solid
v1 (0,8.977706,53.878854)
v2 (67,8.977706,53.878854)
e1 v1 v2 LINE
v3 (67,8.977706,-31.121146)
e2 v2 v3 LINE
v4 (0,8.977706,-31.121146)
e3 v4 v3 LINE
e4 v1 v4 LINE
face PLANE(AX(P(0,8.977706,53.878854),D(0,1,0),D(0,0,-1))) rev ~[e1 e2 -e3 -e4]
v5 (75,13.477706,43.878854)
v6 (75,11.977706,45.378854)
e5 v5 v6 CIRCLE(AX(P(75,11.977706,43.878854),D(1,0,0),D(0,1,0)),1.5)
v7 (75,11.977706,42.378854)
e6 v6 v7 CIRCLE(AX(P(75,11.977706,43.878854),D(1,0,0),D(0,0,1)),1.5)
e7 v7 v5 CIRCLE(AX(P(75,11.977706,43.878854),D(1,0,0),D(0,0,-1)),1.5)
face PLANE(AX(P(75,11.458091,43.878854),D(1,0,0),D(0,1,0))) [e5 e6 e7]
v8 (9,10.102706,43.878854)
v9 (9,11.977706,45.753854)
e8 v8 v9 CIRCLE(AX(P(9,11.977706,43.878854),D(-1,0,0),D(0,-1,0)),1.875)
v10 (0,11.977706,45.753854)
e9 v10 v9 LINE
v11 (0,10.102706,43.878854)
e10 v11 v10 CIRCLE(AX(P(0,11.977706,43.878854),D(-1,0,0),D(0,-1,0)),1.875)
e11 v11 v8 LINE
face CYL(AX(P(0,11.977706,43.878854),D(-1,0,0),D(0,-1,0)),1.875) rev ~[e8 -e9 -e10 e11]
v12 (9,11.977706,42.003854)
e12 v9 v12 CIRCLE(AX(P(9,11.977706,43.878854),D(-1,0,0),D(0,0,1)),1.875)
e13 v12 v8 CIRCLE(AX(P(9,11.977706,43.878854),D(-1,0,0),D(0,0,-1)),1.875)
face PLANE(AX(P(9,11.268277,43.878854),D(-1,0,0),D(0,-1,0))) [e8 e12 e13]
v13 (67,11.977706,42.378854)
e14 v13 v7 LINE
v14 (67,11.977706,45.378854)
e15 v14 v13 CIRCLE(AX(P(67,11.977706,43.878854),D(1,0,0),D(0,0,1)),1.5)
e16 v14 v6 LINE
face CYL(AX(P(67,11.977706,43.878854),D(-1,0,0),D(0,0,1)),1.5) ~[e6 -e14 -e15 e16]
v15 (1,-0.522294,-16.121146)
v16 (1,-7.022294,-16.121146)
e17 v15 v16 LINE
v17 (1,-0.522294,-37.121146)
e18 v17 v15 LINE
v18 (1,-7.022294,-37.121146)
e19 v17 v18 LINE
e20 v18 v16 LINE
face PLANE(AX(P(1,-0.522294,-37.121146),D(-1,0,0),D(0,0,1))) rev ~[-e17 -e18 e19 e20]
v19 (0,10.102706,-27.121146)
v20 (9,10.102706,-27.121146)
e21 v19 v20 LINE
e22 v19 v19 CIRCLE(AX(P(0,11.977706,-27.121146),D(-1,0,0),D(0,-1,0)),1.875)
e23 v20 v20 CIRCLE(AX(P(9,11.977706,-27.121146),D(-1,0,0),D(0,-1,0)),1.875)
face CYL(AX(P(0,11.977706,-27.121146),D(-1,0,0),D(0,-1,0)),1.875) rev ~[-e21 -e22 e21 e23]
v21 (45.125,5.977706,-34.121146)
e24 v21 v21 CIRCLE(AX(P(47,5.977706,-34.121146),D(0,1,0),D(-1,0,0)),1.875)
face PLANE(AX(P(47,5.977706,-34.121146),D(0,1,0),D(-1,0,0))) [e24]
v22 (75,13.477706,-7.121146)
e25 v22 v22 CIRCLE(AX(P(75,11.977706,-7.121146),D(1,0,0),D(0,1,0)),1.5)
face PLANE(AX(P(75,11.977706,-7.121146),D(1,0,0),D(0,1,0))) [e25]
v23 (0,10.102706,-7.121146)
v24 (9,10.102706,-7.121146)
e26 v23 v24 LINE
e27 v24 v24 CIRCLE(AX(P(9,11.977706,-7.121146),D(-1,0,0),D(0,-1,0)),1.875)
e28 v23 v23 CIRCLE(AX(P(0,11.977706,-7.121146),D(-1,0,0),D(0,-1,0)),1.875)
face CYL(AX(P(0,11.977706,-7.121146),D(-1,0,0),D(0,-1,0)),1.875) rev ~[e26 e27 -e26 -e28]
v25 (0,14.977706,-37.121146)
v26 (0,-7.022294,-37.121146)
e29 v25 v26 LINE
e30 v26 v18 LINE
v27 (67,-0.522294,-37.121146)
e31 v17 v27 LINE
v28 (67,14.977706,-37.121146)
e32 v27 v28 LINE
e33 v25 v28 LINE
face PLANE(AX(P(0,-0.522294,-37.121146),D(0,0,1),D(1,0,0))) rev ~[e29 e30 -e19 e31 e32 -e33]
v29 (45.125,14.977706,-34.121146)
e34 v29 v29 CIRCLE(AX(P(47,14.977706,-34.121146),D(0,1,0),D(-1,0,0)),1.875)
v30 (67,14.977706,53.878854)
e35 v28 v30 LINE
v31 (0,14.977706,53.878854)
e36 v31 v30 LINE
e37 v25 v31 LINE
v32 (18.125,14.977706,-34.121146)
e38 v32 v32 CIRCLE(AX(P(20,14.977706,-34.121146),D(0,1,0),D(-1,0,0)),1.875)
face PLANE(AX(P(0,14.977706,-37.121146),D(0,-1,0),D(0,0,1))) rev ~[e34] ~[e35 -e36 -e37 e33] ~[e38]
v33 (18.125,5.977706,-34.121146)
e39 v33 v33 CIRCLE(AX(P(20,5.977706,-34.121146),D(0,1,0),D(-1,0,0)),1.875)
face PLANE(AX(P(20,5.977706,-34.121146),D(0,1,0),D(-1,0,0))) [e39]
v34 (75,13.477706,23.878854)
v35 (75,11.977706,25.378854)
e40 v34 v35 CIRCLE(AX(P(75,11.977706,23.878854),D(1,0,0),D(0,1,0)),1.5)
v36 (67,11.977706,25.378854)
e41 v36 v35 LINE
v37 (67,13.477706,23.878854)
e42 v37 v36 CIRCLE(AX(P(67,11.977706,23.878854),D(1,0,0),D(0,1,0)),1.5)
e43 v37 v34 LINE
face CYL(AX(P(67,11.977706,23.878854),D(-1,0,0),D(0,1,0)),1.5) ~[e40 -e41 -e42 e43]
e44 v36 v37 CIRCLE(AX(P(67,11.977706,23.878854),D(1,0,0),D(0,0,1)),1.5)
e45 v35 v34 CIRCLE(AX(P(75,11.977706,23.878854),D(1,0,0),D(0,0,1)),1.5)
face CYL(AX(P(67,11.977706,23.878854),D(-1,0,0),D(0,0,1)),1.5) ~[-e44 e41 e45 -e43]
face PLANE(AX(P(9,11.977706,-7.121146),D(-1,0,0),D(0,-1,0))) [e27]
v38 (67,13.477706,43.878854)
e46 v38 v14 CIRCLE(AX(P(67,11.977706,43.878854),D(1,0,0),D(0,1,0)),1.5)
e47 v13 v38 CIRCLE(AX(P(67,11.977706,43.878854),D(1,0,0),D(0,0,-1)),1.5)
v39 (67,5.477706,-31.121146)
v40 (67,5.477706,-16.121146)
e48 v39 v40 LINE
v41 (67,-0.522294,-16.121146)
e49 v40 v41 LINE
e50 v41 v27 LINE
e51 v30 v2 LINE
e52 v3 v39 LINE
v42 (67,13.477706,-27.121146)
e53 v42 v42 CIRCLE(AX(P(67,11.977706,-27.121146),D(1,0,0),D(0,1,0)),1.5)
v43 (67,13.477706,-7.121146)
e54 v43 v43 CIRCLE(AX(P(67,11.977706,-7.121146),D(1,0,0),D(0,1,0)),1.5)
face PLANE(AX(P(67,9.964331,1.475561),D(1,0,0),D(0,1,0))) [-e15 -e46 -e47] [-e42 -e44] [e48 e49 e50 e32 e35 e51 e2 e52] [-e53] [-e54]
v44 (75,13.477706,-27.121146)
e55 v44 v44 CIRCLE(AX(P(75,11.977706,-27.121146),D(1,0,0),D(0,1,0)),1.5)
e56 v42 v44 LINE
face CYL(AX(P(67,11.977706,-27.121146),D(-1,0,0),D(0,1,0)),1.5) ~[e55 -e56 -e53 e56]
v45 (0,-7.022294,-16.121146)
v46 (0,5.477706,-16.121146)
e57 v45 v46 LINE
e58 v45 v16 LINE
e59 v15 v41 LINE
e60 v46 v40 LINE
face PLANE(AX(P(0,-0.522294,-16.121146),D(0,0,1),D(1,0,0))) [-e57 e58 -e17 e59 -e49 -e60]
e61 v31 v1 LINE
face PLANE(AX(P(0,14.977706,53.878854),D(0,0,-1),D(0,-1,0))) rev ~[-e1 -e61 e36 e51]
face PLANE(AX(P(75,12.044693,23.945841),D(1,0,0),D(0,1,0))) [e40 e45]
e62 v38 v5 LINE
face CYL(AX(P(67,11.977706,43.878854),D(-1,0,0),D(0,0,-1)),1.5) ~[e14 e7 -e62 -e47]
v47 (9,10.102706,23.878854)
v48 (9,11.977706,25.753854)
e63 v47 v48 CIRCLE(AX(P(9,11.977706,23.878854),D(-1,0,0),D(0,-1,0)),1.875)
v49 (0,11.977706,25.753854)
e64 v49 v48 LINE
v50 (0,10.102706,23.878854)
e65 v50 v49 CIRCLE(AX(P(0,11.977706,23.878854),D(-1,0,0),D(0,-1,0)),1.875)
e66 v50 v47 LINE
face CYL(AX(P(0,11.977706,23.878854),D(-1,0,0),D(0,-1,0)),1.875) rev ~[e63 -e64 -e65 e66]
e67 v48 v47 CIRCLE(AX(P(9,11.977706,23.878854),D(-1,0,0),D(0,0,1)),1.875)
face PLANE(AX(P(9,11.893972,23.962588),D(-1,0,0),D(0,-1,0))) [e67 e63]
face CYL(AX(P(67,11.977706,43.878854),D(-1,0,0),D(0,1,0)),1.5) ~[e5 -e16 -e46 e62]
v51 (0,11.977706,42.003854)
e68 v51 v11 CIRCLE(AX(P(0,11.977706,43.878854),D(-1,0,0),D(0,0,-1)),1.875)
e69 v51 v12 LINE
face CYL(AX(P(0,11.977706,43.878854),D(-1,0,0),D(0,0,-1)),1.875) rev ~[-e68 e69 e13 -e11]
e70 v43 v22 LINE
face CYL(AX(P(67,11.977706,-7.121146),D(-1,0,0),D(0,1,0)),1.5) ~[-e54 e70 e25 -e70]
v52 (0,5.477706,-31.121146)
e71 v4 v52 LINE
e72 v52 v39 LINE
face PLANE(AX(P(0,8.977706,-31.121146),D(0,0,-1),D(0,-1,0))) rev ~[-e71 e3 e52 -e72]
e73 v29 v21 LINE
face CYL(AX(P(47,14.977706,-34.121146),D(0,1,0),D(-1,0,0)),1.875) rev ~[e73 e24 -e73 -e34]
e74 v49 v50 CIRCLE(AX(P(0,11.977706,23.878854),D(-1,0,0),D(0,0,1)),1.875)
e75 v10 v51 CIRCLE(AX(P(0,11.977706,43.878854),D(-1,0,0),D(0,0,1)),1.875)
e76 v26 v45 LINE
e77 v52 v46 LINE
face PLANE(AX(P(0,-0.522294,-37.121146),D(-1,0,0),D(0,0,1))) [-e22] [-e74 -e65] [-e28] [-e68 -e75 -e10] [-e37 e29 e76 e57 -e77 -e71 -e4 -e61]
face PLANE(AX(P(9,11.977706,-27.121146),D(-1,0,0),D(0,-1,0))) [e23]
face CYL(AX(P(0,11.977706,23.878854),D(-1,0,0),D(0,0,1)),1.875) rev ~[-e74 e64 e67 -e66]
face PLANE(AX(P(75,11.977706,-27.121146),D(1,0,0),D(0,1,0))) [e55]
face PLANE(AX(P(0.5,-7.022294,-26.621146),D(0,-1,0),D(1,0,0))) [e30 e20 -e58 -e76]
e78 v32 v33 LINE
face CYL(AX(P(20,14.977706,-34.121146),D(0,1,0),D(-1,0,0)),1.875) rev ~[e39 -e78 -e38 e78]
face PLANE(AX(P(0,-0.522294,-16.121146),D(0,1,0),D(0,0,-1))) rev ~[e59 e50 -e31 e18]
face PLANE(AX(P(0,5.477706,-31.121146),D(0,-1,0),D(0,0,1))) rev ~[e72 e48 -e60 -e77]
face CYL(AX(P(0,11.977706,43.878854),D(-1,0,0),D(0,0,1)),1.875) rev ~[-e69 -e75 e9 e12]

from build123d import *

# Parameters (mm, degrees)
F1_DEPTH  = 67
F2_R      = 1.5
F3_DEPTH  = 8
F4_R      = 1.875
F5_DEPTH  = 9
F6_R      = 1.875
F7_DEPTH  = 9
F8_W      = 1
F8_H      = 21
F9_DEPTH  = 6.5
F10_R     = 1.875
F11_DEPTH = 9


# Not quite as in the source:
# - a feature names something its author has since deleted; it is built from what else it names


with BuildPart() as f1:
    # F0 (on Right) → F1 (new body)
    with BuildSketch(Plane.YZ):
        Polygon((14.9777059274, -37.1211464703), (14.9777059274, 53.8788535297), (8.9777059274, 53.8788535297), (8.9777059274, -31.1211464703), (5.4777059274, -31.1211464703), (5.4777059274, -16.1211464703), (-0.5222940726, -16.1211464703), (-0.5222940726, -37.1211464703), align=None)
    extrude(amount=F1_DEPTH)

    # F2 (on face) → F3 (join)
    with BuildSketch(Plane.YZ.offset(67)):
        with BuildLine():
            Line((11.9777059274, 43.8788535297), (11.9777059274, 45.3788535297))
            ThreePointArc((11.9777059274, 45.3788535297), (10.4777059274, 43.8788535297), (11.9777059274, 42.3788535297))
            Line((11.9777059274, 42.3788535297), (11.9777059274, 43.8788535297))
        make_face()
        with BuildLine():
            ThreePointArc((11.9777059274, 42.3788535297), (13.0383660992, 42.8181933579), (13.4777059274, 43.8788535297))
            ThreePointArc((13.4777059274, 43.8788535297), (13.0383660992, 44.9395137015), (11.9777059274, 45.3788535297))
            Line((11.9777059274, 45.3788535297), (11.9777059274, 43.8788535297))
            Line((11.9777059274, 43.8788535297), (11.9777059274, 42.3788535297))
        make_face()
        with BuildLine():
            ThreePointArc((13.4777059274, 23.8788535297), (13.0383660992, 24.9395137015), (11.9777059274, 25.3788535297))
            ThreePointArc((11.9777059274, 25.3788535297), (10.9170457557, 22.8181933579), (13.4777059274, 23.8788535297))
        make_face()
        with Locations((11.9777059274, -7.1211464703)):
            Circle(F2_R)
        with Locations((11.9777059274, -27.1211464703)):
            Circle(F2_R)
    extrude(amount=F3_DEPTH)

    # F4 (on face) → F5 (cut)
    with BuildSketch(Plane(origin=(0, 0, 0), x_dir=(0, -1, 0), z_dir=(-1, 0, 0))):
        with Locations((-18.4777059274, 23.8788535297)):
            Circle(F4_R)
        with Locations((-18.4777059274, 43.8788535297)):
            Circle(F4_R)
        with Locations((-18.4777059274, -7.1211464703)):
            Circle(F4_R)
        with Locations((-18.4777059274, -27.1211464703)):
            Circle(F4_R)
    extrude(amount=-F5_DEPTH, mode=Mode.SUBTRACT)

    # F6 (on face) → F7 (cut)
    with BuildSketch(Plane(origin=(0, 14.9777059274, 0), x_dir=(-1, 0, 0), z_dir=(0, 1, 0))):
        with Locations((-47, -34.1211464703)):
            Circle(F6_R)
        with Locations((-20, -34.1211464703)):
            Circle(F6_R)
    extrude(amount=-F7_DEPTH, mode=Mode.SUBTRACT)

    # F8 (on face) → F9 (join)
    with BuildSketch(Plane.XZ.offset(0.5222940726)):
        with Locations((0.5, -26.6211464703)):
            Rectangle(F8_W, F8_H)
    extrude(amount=F9_DEPTH)

    # F10 (on face) → F11 (cut)
    with BuildSketch(Plane(origin=(0, 0, 0), x_dir=(0, -1, 0), z_dir=(-1, 0, 0))):
        with BuildLine():
            ThreePointArc((-10.1027059274, 43.8788535297), (-10.6518807127, 45.2046787444), (-11.9777059274, 45.7538535297))
            Line((-11.9777059274, 45.7538535297), (-11.9777059274, 43.8788535297))
            Line((-11.9777059274, 43.8788535297), (-11.9777059274, 42.0038535297))
            ThreePointArc((-11.9777059274, 42.0038535297), (-10.6518807127, 42.553028315), (-10.1027059274, 43.8788535297))
        make_face()
        with BuildLine():
            ThreePointArc((-10.1027059274, 23.8788535297), (-10.6518807127, 25.2046787444), (-11.9777059274, 25.7538535297))
            ThreePointArc((-11.9777059274, 25.7538535297), (-13.3035311422, 22.553028315), (-10.1027059274, 23.8788535297))
        make_face()
        with BuildLine():
            Line((-11.9777059274, 43.8788535297), (-11.9777059274, 45.7538535297))
            ThreePointArc((-11.9777059274, 45.7538535297), (-13.8527059274, 43.8788535297), (-11.9777059274, 42.0038535297))
            Line((-11.9777059274, 42.0038535297), (-11.9777059274, 43.8788535297))
        make_face()
        with Locations((-11.9777059274, -27.1211464703)):
            Circle(F10_R)
        with Locations((-11.9777059274, -7.1211464703)):
            Circle(F10_R)
    extrude(amount=-F11_DEPTH, mode=Mode.SUBTRACT)


solid = f1.part
